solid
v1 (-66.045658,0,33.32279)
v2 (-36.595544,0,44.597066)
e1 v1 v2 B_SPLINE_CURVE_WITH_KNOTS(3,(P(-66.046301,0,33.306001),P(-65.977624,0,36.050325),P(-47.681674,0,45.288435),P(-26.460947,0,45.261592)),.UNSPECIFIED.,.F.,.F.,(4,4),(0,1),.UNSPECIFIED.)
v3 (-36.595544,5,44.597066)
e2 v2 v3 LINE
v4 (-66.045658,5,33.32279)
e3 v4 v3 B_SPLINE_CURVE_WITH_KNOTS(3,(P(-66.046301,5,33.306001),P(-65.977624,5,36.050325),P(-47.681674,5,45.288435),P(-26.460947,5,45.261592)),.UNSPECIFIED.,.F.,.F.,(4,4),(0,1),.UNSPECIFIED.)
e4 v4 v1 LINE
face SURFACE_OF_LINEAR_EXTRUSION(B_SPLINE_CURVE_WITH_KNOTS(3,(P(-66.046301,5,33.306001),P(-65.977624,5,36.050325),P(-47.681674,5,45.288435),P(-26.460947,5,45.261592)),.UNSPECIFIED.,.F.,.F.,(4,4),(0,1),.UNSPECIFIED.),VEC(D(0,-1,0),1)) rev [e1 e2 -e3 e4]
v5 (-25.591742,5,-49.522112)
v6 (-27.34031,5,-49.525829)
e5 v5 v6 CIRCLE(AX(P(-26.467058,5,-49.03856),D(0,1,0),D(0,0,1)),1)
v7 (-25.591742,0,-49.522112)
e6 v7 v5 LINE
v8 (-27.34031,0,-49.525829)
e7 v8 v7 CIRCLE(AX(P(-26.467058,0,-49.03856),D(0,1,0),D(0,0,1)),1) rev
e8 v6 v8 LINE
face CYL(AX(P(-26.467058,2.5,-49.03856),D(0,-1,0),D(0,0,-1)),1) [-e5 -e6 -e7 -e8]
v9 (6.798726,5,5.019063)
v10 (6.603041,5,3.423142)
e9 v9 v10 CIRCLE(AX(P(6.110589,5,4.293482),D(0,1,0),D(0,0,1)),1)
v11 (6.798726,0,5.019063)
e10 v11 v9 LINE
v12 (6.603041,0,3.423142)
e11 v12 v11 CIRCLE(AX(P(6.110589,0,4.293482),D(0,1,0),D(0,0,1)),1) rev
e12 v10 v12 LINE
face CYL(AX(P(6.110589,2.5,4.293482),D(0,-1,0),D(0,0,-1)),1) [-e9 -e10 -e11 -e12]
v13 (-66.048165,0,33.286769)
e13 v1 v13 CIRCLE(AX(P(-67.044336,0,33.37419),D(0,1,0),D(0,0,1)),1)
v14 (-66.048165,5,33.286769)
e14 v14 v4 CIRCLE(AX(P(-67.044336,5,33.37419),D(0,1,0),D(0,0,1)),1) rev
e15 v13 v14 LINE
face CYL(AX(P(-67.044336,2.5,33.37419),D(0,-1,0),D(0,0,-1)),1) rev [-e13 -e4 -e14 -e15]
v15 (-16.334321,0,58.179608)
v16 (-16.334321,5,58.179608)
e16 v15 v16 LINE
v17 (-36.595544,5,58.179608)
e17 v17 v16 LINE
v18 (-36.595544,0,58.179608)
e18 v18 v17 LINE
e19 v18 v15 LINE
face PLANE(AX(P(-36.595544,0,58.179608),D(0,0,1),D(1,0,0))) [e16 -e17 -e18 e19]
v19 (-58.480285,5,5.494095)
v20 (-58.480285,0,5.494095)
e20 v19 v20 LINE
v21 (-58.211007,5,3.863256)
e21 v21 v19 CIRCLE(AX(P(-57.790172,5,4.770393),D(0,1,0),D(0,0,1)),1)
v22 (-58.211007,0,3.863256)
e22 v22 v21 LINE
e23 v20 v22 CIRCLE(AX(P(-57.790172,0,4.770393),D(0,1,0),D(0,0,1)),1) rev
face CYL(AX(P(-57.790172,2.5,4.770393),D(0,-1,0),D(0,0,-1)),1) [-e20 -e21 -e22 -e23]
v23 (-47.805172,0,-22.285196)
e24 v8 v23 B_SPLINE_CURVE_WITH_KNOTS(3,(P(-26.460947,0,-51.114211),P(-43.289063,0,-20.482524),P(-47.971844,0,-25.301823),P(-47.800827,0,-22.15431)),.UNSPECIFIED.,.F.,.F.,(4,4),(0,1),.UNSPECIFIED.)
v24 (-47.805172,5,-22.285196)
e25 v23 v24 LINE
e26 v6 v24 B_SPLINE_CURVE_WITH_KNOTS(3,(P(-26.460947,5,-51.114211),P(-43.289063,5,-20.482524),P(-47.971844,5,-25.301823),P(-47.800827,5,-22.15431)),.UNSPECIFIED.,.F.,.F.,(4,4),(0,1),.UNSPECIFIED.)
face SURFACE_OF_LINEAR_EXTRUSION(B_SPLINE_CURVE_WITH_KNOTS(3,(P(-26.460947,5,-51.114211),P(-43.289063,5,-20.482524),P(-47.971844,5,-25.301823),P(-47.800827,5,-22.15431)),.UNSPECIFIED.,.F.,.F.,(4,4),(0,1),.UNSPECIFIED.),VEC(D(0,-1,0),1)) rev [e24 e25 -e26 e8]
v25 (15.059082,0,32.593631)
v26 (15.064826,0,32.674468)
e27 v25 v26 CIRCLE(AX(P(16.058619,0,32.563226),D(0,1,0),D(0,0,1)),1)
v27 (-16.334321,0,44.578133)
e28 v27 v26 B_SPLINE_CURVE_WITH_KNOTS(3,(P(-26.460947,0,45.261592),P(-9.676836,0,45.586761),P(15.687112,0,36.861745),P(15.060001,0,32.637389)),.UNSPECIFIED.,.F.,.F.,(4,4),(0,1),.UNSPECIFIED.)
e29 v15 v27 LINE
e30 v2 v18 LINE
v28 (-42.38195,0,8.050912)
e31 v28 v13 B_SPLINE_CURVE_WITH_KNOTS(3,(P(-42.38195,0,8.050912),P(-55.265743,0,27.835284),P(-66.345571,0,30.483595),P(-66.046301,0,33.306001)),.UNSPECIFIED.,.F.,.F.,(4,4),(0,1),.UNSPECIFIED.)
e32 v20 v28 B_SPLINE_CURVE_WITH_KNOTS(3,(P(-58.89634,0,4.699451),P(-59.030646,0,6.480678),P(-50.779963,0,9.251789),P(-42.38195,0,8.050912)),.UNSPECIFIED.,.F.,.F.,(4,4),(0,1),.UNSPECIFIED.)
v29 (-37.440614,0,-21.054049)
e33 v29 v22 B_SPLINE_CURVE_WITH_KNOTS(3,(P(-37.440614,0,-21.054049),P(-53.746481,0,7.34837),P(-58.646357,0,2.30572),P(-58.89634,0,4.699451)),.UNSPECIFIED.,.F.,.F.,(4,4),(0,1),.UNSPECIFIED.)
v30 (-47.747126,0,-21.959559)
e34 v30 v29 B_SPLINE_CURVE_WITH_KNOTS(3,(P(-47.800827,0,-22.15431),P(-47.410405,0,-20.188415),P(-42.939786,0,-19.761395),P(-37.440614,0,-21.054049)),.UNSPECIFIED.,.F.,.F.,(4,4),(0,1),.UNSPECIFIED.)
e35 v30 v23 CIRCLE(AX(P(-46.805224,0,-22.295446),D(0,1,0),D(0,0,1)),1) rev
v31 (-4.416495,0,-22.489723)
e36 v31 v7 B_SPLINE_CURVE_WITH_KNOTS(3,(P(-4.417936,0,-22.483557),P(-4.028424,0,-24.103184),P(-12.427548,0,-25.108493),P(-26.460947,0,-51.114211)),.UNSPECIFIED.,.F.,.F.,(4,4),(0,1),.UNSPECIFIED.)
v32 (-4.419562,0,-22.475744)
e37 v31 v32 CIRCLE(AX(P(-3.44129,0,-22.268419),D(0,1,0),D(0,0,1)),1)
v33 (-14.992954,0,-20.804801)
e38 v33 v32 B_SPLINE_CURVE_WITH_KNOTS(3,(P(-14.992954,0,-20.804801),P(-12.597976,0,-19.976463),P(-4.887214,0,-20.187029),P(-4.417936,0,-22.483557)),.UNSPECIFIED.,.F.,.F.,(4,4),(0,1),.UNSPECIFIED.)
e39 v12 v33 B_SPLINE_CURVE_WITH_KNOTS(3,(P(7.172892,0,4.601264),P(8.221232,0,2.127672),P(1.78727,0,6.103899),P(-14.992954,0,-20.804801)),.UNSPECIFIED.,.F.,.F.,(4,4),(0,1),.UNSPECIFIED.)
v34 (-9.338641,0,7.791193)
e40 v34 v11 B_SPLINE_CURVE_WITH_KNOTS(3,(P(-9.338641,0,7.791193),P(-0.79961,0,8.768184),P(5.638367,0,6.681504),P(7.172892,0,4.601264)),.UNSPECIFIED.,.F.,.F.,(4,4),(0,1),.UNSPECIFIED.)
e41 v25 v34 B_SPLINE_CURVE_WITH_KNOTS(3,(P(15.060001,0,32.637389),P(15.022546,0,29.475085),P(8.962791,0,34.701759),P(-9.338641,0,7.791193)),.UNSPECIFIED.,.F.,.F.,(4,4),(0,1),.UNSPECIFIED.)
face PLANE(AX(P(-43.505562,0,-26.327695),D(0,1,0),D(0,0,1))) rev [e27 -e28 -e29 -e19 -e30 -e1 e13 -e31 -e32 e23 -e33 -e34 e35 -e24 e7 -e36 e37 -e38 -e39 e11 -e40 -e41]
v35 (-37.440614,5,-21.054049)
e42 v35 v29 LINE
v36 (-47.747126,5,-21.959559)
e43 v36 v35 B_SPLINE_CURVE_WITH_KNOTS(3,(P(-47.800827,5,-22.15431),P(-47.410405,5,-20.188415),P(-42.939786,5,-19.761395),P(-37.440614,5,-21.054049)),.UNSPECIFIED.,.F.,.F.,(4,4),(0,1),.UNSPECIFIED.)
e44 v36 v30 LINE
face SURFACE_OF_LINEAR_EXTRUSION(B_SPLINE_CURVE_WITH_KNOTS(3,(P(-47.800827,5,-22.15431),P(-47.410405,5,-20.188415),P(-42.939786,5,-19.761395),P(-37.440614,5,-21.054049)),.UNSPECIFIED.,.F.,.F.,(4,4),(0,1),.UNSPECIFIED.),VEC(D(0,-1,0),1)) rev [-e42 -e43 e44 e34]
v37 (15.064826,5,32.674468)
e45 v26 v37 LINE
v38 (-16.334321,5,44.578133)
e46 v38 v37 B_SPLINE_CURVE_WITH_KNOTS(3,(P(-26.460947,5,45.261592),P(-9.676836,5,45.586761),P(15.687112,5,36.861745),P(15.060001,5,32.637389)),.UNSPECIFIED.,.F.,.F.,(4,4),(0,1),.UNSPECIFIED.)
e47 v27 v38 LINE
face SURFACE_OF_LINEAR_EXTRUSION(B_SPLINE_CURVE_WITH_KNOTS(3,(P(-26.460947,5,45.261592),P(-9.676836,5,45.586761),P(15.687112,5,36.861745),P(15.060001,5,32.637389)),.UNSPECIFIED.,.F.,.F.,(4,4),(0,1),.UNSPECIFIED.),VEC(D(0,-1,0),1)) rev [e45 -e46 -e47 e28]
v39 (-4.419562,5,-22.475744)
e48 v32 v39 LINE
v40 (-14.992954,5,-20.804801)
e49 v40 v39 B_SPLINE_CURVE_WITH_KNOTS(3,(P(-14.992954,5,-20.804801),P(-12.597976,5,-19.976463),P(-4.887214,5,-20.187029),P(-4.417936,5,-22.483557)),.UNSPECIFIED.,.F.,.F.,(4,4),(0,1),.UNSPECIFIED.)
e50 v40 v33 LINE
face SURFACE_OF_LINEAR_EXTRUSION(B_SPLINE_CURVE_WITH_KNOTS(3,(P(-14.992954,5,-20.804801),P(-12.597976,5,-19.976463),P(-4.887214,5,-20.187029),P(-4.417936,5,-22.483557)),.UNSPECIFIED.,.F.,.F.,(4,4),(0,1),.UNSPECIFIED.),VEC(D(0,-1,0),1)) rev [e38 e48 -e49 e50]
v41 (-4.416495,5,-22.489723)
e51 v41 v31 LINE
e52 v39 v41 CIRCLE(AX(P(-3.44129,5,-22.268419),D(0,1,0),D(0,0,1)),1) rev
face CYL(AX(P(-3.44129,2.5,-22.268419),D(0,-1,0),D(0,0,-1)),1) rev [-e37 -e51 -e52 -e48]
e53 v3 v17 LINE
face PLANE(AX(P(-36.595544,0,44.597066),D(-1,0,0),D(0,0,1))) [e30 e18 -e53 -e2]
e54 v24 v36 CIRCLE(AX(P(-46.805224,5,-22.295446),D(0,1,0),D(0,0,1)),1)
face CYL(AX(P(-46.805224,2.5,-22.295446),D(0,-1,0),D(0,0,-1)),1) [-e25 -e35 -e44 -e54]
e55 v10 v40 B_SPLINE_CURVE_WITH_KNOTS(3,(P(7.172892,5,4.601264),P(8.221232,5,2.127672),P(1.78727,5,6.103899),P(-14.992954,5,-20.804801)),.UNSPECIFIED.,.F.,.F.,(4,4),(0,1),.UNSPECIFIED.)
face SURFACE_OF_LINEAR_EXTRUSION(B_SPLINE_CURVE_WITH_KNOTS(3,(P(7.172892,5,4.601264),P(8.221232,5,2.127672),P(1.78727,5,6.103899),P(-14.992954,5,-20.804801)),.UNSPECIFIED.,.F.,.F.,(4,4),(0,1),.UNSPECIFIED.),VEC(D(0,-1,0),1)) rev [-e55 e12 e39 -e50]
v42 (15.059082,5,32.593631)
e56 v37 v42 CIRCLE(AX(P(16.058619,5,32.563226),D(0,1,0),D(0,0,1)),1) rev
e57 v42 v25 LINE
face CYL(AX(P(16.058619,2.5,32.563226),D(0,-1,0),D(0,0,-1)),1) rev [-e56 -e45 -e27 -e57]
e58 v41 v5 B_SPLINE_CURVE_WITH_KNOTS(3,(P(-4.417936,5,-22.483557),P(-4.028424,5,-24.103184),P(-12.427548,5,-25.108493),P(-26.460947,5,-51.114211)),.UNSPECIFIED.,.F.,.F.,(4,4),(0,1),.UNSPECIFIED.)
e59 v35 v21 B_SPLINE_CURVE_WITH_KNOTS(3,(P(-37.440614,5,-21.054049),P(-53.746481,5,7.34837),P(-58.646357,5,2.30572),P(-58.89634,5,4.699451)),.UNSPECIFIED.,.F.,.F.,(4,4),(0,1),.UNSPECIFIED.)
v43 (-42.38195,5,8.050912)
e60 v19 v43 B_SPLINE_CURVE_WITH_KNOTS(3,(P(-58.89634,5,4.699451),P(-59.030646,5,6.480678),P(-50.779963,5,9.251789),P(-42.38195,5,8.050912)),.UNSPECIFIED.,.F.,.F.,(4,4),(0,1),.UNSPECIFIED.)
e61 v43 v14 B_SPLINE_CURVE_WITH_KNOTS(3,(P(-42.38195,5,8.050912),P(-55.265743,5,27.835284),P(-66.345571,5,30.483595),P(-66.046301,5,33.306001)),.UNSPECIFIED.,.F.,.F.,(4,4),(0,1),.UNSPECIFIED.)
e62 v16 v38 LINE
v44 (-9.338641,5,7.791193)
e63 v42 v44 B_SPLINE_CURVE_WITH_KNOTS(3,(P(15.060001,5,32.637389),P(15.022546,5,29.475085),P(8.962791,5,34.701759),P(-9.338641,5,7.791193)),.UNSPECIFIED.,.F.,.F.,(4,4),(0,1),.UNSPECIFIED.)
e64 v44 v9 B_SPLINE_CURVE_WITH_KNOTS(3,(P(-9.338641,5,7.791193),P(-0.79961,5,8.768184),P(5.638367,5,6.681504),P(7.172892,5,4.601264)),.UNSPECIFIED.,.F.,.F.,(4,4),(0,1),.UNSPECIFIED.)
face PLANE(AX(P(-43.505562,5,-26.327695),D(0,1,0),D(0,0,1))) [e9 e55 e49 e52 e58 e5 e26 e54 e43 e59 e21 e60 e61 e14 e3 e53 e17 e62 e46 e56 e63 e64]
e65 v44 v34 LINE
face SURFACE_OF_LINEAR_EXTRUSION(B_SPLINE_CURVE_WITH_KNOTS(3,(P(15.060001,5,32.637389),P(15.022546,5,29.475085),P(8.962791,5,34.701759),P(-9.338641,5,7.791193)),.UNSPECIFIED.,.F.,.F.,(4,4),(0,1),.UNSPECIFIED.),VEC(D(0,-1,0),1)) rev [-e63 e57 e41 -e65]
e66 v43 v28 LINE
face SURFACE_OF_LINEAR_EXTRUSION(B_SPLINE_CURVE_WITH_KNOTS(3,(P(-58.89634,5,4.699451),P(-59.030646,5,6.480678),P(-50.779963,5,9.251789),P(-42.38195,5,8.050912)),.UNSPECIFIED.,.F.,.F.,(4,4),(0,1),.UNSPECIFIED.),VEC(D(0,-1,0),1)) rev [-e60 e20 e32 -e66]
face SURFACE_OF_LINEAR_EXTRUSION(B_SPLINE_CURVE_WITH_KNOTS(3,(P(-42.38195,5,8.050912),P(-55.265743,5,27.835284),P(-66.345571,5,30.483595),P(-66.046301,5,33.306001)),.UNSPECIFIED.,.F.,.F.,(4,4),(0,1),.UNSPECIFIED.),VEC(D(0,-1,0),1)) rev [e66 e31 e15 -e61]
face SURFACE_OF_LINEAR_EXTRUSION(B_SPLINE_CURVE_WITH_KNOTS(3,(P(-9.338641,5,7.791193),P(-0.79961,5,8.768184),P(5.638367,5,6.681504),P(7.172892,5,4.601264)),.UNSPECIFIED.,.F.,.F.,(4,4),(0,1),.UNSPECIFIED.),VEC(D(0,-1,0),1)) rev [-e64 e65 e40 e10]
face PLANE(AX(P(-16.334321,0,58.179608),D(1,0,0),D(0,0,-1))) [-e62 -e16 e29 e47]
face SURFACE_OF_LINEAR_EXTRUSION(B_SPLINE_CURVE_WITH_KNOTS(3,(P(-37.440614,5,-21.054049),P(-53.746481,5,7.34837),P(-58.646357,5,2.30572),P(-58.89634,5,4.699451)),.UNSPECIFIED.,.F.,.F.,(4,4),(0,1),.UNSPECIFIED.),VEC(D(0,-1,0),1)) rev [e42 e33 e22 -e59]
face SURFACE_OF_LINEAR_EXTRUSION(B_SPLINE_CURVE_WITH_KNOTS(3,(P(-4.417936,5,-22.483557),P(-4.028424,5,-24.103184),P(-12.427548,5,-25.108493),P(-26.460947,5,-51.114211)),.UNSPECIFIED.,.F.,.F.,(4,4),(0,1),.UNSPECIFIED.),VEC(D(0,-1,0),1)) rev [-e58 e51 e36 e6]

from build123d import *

# Parameters (mm, degrees)
BOSS_EXTRUDE1_DEPTH = 5
FILLET1_R           = 10
FILLET2_START       = -1
FILLET2_DEPTH       = 7
FILLET2_2_DEPTH     = 5
FILLET3_R           = 1
BOSS_EXTRUDE2_DEPTH = 5


with BuildPart() as part:
    # Sketch2 → Boss-Extrude1 (new body)
    with BuildSketch(Plane(origin=(0, 0, 0), x_dir=(1, 0, 0), z_dir=(0, 1, 0))):
        with BuildLine():
            add(Edge.make_bspline(
                [(-26.460947075, 51.114211153), (-12.427548014, 25.108493293), (-4.028423797, 24.103183764), (-4.41793616, 22.483556797)],
                knots=[0, 0, 0, 0, 1, 1, 1, 1], degree=3))
            add(Edge.make_bspline(
                [(-4.41793616, 22.483556797), (-4.887213543, 20.187029491), (-12.597975929, 19.976462624), (-14.992954401, 20.804801043)],
                knots=[0, 0, 0, 0, 1, 1, 1, 1], degree=3))
            add(Edge.make_bspline(
                [(-14.992954401, 20.804801043), (1.787270351, -6.103899351), (8.22123179, -2.127672237), (7.172892256, -4.601264311)],
                knots=[0, 0, 0, 0, 1, 1, 1, 1], degree=3))
            add(Edge.make_bspline(
                [(7.172892256, -4.601264311), (5.638367492, -6.681504252), (-0.799609665, -8.768183654), (-9.338641476, -7.791193384)],
                knots=[0, 0, 0, 0, 1, 1, 1, 1], degree=3))
            add(Edge.make_bspline(
                [(-9.338641476, -7.791193384), (8.962790554, -34.701758749), (15.02254586, -29.475085195), (15.060000948, -32.637388979)],
                knots=[0, 0, 0, 0, 1, 1, 1, 1], degree=3))
            add(Edge.make_bspline(
                [(-26.460947075, -45.261592135), (-9.676835521, -45.586760912), (15.687111692, -36.861745266), (15.060000948, -32.637388979)],
                knots=[0, 0, 0, 0, 1, 1, 1, 1], degree=3))
            add(Edge.make_bspline(
                [(-66.046301456, -33.30600061), (-65.977623625, -36.050325123), (-47.681674197, -45.288435387), (-26.460947075, -45.261592135)],
                knots=[0, 0, 0, 0, 1, 1, 1, 1], degree=3))
            add(Edge.make_bspline(
                [(-42.38194966, -8.050912304), (-55.265743099, -27.835283819), (-66.345571411, -30.483595462), (-66.046301456, -33.30600061)],
                knots=[0, 0, 0, 0, 1, 1, 1, 1], degree=3))
            add(Edge.make_bspline(
                [(-58.896340189, -4.69945124), (-59.030645987, -6.480678116), (-50.779962761, -9.251788646), (-42.38194966, -8.050912304)],
                knots=[0, 0, 0, 0, 1, 1, 1, 1], degree=3))
            add(Edge.make_bspline(
                [(-37.440614, 21.054048916), (-53.746480623, -7.348370101), (-58.646356675, -2.305720166), (-58.896340189, -4.69945124)],
                knots=[0, 0, 0, 0, 1, 1, 1, 1], degree=3))
            add(Edge.make_bspline(
                [(-47.800827469, 22.154310098), (-47.410404752, 20.188415441), (-42.93978555, 19.761395244), (-37.440614, 21.054048916)],
                knots=[0, 0, 0, 0, 1, 1, 1, 1], degree=3))
            add(Edge.make_bspline(
                [(-26.460947075, 51.114211153), (-43.28906286, 20.482524417), (-47.971844347, 25.301823121), (-47.800827469, 22.154310098)],
                knots=[0, 0, 0, 0, 1, 1, 1, 1], degree=3))
        make_face()
    extrude(amount=BOSS_EXTRUDE1_DEPTH)

    # Fillet1
    # the kernel refuses this fillet: 10 mm, written as the material it adds along each edge
    with BuildSketch(Plane(origin=(-26.460947075, 0, 45.261592135), x_dir=(0.9998301014874635, 0, 0.018432801186160547), z_dir=(0, 1, 0))) as fillet1_piece_1:
        with BuildLine():
            CenterArc((0.095571826, -9.99999563), FILLET1_R, 90.053566795, 1.005062424)
            ThreePointArc((-0.089183316, -0.001702498), (-0.044591398, -0.000864875), (0, 0))
            ThreePointArc((0, 0), (0.043111329, -2.0179e-05), (0.086222658, 0))
        make_face()
    extrude(amount=5)

    # Fillet2: read off the stored shape, not the designer's step
    # Fillet2 outline → Fillet2 (cut)
    with BuildSketch(Plane(origin=(0, 0, 0), x_dir=(1, 0, 0), z_dir=(0, 1, 0)).offset(FILLET2_START)):
        with BuildLine():
            add(Edge.make_bspline(
                [(-47.800827469, 22.154310098), (-47.787582934, 22.087619919), (-47.769642872, 22.022700691), (-47.747126417, 21.959559472)],
                knots=[0, 0, 0, 0, 0.033923577, 0.033923577, 0.033923577, 0.033923577], degree=3))
            ThreePointArc((-47.747126417, 21.959559472), (-47.789706131, 22.119961107), (-47.805171518, 22.285195905))
            add(Edge.make_bspline(
                [(-47.805171518, 22.285195905), (-47.80474027, 22.243126607), (-47.803285041, 22.199540953), (-47.800827469, 22.154310098)],
                knots=[0.985629653, 0.985629653, 0.985629653, 0.985629653, 1, 1, 1, 1], degree=3))
        make_face()
        with BuildLine():
            ThreePointArc((-58.480285024, -5.49409461), (-58.77681304, -4.607482629), (-58.211007375, -3.86325577))
            add(Edge.make_bspline(
                [(-58.211007375, -3.86325577), (-58.63585352, -4.060348609), (-58.849105033, -4.247148374), (-58.896340189, -4.69945124)],
                knots=[0.811046917, 0.811046917, 0.811046917, 0.811046917, 1, 1, 1, 1], degree=3))
            add(Edge.make_bspline(
                [(-58.896340189, -4.69945124), (-58.915187245, -4.949409799), (-58.768914163, -5.218861494), (-58.480285024, -5.49409461)],
                knots=[0, 0, 0, 0, 0.140329434, 0.140329434, 0.140329434, 0.140329434], degree=3))
        make_face()
        with BuildLine():
            ThreePointArc((6.603041154, -3.423142366), (7.103155792, -4.171777978), (6.798725932, -5.019063284))
            add(Edge.make_bspline(
                [(6.798725932, -5.019063284), (6.944949461, -4.880385824), (7.069953552, -4.740810579), (7.172892256, -4.601264311)],
                knots=[0.932918187, 0.932918187, 0.932918187, 0.932918187, 1, 1, 1, 1], degree=3))
            add(Edge.make_bspline(
                [(7.172892256, -4.601264311), (7.423474277, -4.01000768), (7.246561276, -3.787256085), (6.603041154, -3.423142366)],
                knots=[0, 0, 0, 0, 0.239027541, 0.239027541, 0.239027541, 0.239027541], degree=3))
        make_face()
    extrude(amount=FILLET2_DEPTH, mode=Mode.SUBTRACT)

    # Fillet2 2 outline → Fillet2 2 (add)
    with BuildSketch(Plane(origin=(0, 0, 0), x_dir=(1, 0, 0), z_dir=(0, 1, 0))):
        with BuildLine():
            add(Edge.make_bspline(
                [(-66.048164843, -33.286769384), (-66.047602355, -33.29317903), (-66.046981263, -33.299589371), (-66.046301456, -33.30600061)],
                knots=[0.997728448, 0.997728448, 0.997728448, 0.997728448, 1, 1, 1, 1], degree=3))
            ThreePointArc((-66.048164843, -33.286769384), (-66.04674894, -33.304768154), (-66.045658211, -33.322789552))
            add(Edge.make_bspline(
                [(-66.046301456, -33.30600061), (-66.046162074, -33.311570221), (-66.045947617, -33.317166579), (-66.045658211, -33.322789552)],
                knots=[0, 0, 0, 0, 0.002029502, 0.002029502, 0.002029502, 0.002029502], degree=3))
        make_face()
        with BuildLine():
            add(Edge.make_bspline(
                [(15.064825863, -32.674467974), (15.063438106, -32.662070244), (15.061830087, -32.649710467), (15.060000948, -32.637388979)],
                knots=[0.997083227, 0.997083227, 0.997083227, 0.997083227, 1, 1, 1, 1], degree=3))
            ThreePointArc((15.064825863, -32.674467974), (15.061134508, -32.634107801), (15.059081591, -32.593631201))
            add(Edge.make_bspline(
                [(15.060000948, -32.637388979), (15.059826038, -32.622621486), (15.059519797, -32.608036936), (15.059081591, -32.593631201)],
                knots=[0, 0, 0, 0, 0.004669853, 0.004669853, 0.004669853, 0.004669853], degree=3))
        make_face()
    extrude(amount=FILLET2_2_DEPTH)

    # Fillet3
    fillet3_edges = [part.edges().sort_by_distance(p)[0] for p in [
        (-26.460947075, 2.5, -51.114211153),
    ]]
    fillet(fillet3_edges, radius=FILLET3_R)

    # Sketch3 → Boss-Extrude2 (add)
    with BuildSketch(Plane(origin=(0, 5, 0), x_dir=(1, 0, 0), z_dir=(0, 1, 0))):
        Polygon((-36.595543758, -44.59706636), (-36.595543758, -58.179607966), (-16.334320806, -58.179607966), (-16.334320806, -44.578133049), align=None)
    extrude(amount=-BOSS_EXTRUDE2_DEPTH)


solid = part.part
